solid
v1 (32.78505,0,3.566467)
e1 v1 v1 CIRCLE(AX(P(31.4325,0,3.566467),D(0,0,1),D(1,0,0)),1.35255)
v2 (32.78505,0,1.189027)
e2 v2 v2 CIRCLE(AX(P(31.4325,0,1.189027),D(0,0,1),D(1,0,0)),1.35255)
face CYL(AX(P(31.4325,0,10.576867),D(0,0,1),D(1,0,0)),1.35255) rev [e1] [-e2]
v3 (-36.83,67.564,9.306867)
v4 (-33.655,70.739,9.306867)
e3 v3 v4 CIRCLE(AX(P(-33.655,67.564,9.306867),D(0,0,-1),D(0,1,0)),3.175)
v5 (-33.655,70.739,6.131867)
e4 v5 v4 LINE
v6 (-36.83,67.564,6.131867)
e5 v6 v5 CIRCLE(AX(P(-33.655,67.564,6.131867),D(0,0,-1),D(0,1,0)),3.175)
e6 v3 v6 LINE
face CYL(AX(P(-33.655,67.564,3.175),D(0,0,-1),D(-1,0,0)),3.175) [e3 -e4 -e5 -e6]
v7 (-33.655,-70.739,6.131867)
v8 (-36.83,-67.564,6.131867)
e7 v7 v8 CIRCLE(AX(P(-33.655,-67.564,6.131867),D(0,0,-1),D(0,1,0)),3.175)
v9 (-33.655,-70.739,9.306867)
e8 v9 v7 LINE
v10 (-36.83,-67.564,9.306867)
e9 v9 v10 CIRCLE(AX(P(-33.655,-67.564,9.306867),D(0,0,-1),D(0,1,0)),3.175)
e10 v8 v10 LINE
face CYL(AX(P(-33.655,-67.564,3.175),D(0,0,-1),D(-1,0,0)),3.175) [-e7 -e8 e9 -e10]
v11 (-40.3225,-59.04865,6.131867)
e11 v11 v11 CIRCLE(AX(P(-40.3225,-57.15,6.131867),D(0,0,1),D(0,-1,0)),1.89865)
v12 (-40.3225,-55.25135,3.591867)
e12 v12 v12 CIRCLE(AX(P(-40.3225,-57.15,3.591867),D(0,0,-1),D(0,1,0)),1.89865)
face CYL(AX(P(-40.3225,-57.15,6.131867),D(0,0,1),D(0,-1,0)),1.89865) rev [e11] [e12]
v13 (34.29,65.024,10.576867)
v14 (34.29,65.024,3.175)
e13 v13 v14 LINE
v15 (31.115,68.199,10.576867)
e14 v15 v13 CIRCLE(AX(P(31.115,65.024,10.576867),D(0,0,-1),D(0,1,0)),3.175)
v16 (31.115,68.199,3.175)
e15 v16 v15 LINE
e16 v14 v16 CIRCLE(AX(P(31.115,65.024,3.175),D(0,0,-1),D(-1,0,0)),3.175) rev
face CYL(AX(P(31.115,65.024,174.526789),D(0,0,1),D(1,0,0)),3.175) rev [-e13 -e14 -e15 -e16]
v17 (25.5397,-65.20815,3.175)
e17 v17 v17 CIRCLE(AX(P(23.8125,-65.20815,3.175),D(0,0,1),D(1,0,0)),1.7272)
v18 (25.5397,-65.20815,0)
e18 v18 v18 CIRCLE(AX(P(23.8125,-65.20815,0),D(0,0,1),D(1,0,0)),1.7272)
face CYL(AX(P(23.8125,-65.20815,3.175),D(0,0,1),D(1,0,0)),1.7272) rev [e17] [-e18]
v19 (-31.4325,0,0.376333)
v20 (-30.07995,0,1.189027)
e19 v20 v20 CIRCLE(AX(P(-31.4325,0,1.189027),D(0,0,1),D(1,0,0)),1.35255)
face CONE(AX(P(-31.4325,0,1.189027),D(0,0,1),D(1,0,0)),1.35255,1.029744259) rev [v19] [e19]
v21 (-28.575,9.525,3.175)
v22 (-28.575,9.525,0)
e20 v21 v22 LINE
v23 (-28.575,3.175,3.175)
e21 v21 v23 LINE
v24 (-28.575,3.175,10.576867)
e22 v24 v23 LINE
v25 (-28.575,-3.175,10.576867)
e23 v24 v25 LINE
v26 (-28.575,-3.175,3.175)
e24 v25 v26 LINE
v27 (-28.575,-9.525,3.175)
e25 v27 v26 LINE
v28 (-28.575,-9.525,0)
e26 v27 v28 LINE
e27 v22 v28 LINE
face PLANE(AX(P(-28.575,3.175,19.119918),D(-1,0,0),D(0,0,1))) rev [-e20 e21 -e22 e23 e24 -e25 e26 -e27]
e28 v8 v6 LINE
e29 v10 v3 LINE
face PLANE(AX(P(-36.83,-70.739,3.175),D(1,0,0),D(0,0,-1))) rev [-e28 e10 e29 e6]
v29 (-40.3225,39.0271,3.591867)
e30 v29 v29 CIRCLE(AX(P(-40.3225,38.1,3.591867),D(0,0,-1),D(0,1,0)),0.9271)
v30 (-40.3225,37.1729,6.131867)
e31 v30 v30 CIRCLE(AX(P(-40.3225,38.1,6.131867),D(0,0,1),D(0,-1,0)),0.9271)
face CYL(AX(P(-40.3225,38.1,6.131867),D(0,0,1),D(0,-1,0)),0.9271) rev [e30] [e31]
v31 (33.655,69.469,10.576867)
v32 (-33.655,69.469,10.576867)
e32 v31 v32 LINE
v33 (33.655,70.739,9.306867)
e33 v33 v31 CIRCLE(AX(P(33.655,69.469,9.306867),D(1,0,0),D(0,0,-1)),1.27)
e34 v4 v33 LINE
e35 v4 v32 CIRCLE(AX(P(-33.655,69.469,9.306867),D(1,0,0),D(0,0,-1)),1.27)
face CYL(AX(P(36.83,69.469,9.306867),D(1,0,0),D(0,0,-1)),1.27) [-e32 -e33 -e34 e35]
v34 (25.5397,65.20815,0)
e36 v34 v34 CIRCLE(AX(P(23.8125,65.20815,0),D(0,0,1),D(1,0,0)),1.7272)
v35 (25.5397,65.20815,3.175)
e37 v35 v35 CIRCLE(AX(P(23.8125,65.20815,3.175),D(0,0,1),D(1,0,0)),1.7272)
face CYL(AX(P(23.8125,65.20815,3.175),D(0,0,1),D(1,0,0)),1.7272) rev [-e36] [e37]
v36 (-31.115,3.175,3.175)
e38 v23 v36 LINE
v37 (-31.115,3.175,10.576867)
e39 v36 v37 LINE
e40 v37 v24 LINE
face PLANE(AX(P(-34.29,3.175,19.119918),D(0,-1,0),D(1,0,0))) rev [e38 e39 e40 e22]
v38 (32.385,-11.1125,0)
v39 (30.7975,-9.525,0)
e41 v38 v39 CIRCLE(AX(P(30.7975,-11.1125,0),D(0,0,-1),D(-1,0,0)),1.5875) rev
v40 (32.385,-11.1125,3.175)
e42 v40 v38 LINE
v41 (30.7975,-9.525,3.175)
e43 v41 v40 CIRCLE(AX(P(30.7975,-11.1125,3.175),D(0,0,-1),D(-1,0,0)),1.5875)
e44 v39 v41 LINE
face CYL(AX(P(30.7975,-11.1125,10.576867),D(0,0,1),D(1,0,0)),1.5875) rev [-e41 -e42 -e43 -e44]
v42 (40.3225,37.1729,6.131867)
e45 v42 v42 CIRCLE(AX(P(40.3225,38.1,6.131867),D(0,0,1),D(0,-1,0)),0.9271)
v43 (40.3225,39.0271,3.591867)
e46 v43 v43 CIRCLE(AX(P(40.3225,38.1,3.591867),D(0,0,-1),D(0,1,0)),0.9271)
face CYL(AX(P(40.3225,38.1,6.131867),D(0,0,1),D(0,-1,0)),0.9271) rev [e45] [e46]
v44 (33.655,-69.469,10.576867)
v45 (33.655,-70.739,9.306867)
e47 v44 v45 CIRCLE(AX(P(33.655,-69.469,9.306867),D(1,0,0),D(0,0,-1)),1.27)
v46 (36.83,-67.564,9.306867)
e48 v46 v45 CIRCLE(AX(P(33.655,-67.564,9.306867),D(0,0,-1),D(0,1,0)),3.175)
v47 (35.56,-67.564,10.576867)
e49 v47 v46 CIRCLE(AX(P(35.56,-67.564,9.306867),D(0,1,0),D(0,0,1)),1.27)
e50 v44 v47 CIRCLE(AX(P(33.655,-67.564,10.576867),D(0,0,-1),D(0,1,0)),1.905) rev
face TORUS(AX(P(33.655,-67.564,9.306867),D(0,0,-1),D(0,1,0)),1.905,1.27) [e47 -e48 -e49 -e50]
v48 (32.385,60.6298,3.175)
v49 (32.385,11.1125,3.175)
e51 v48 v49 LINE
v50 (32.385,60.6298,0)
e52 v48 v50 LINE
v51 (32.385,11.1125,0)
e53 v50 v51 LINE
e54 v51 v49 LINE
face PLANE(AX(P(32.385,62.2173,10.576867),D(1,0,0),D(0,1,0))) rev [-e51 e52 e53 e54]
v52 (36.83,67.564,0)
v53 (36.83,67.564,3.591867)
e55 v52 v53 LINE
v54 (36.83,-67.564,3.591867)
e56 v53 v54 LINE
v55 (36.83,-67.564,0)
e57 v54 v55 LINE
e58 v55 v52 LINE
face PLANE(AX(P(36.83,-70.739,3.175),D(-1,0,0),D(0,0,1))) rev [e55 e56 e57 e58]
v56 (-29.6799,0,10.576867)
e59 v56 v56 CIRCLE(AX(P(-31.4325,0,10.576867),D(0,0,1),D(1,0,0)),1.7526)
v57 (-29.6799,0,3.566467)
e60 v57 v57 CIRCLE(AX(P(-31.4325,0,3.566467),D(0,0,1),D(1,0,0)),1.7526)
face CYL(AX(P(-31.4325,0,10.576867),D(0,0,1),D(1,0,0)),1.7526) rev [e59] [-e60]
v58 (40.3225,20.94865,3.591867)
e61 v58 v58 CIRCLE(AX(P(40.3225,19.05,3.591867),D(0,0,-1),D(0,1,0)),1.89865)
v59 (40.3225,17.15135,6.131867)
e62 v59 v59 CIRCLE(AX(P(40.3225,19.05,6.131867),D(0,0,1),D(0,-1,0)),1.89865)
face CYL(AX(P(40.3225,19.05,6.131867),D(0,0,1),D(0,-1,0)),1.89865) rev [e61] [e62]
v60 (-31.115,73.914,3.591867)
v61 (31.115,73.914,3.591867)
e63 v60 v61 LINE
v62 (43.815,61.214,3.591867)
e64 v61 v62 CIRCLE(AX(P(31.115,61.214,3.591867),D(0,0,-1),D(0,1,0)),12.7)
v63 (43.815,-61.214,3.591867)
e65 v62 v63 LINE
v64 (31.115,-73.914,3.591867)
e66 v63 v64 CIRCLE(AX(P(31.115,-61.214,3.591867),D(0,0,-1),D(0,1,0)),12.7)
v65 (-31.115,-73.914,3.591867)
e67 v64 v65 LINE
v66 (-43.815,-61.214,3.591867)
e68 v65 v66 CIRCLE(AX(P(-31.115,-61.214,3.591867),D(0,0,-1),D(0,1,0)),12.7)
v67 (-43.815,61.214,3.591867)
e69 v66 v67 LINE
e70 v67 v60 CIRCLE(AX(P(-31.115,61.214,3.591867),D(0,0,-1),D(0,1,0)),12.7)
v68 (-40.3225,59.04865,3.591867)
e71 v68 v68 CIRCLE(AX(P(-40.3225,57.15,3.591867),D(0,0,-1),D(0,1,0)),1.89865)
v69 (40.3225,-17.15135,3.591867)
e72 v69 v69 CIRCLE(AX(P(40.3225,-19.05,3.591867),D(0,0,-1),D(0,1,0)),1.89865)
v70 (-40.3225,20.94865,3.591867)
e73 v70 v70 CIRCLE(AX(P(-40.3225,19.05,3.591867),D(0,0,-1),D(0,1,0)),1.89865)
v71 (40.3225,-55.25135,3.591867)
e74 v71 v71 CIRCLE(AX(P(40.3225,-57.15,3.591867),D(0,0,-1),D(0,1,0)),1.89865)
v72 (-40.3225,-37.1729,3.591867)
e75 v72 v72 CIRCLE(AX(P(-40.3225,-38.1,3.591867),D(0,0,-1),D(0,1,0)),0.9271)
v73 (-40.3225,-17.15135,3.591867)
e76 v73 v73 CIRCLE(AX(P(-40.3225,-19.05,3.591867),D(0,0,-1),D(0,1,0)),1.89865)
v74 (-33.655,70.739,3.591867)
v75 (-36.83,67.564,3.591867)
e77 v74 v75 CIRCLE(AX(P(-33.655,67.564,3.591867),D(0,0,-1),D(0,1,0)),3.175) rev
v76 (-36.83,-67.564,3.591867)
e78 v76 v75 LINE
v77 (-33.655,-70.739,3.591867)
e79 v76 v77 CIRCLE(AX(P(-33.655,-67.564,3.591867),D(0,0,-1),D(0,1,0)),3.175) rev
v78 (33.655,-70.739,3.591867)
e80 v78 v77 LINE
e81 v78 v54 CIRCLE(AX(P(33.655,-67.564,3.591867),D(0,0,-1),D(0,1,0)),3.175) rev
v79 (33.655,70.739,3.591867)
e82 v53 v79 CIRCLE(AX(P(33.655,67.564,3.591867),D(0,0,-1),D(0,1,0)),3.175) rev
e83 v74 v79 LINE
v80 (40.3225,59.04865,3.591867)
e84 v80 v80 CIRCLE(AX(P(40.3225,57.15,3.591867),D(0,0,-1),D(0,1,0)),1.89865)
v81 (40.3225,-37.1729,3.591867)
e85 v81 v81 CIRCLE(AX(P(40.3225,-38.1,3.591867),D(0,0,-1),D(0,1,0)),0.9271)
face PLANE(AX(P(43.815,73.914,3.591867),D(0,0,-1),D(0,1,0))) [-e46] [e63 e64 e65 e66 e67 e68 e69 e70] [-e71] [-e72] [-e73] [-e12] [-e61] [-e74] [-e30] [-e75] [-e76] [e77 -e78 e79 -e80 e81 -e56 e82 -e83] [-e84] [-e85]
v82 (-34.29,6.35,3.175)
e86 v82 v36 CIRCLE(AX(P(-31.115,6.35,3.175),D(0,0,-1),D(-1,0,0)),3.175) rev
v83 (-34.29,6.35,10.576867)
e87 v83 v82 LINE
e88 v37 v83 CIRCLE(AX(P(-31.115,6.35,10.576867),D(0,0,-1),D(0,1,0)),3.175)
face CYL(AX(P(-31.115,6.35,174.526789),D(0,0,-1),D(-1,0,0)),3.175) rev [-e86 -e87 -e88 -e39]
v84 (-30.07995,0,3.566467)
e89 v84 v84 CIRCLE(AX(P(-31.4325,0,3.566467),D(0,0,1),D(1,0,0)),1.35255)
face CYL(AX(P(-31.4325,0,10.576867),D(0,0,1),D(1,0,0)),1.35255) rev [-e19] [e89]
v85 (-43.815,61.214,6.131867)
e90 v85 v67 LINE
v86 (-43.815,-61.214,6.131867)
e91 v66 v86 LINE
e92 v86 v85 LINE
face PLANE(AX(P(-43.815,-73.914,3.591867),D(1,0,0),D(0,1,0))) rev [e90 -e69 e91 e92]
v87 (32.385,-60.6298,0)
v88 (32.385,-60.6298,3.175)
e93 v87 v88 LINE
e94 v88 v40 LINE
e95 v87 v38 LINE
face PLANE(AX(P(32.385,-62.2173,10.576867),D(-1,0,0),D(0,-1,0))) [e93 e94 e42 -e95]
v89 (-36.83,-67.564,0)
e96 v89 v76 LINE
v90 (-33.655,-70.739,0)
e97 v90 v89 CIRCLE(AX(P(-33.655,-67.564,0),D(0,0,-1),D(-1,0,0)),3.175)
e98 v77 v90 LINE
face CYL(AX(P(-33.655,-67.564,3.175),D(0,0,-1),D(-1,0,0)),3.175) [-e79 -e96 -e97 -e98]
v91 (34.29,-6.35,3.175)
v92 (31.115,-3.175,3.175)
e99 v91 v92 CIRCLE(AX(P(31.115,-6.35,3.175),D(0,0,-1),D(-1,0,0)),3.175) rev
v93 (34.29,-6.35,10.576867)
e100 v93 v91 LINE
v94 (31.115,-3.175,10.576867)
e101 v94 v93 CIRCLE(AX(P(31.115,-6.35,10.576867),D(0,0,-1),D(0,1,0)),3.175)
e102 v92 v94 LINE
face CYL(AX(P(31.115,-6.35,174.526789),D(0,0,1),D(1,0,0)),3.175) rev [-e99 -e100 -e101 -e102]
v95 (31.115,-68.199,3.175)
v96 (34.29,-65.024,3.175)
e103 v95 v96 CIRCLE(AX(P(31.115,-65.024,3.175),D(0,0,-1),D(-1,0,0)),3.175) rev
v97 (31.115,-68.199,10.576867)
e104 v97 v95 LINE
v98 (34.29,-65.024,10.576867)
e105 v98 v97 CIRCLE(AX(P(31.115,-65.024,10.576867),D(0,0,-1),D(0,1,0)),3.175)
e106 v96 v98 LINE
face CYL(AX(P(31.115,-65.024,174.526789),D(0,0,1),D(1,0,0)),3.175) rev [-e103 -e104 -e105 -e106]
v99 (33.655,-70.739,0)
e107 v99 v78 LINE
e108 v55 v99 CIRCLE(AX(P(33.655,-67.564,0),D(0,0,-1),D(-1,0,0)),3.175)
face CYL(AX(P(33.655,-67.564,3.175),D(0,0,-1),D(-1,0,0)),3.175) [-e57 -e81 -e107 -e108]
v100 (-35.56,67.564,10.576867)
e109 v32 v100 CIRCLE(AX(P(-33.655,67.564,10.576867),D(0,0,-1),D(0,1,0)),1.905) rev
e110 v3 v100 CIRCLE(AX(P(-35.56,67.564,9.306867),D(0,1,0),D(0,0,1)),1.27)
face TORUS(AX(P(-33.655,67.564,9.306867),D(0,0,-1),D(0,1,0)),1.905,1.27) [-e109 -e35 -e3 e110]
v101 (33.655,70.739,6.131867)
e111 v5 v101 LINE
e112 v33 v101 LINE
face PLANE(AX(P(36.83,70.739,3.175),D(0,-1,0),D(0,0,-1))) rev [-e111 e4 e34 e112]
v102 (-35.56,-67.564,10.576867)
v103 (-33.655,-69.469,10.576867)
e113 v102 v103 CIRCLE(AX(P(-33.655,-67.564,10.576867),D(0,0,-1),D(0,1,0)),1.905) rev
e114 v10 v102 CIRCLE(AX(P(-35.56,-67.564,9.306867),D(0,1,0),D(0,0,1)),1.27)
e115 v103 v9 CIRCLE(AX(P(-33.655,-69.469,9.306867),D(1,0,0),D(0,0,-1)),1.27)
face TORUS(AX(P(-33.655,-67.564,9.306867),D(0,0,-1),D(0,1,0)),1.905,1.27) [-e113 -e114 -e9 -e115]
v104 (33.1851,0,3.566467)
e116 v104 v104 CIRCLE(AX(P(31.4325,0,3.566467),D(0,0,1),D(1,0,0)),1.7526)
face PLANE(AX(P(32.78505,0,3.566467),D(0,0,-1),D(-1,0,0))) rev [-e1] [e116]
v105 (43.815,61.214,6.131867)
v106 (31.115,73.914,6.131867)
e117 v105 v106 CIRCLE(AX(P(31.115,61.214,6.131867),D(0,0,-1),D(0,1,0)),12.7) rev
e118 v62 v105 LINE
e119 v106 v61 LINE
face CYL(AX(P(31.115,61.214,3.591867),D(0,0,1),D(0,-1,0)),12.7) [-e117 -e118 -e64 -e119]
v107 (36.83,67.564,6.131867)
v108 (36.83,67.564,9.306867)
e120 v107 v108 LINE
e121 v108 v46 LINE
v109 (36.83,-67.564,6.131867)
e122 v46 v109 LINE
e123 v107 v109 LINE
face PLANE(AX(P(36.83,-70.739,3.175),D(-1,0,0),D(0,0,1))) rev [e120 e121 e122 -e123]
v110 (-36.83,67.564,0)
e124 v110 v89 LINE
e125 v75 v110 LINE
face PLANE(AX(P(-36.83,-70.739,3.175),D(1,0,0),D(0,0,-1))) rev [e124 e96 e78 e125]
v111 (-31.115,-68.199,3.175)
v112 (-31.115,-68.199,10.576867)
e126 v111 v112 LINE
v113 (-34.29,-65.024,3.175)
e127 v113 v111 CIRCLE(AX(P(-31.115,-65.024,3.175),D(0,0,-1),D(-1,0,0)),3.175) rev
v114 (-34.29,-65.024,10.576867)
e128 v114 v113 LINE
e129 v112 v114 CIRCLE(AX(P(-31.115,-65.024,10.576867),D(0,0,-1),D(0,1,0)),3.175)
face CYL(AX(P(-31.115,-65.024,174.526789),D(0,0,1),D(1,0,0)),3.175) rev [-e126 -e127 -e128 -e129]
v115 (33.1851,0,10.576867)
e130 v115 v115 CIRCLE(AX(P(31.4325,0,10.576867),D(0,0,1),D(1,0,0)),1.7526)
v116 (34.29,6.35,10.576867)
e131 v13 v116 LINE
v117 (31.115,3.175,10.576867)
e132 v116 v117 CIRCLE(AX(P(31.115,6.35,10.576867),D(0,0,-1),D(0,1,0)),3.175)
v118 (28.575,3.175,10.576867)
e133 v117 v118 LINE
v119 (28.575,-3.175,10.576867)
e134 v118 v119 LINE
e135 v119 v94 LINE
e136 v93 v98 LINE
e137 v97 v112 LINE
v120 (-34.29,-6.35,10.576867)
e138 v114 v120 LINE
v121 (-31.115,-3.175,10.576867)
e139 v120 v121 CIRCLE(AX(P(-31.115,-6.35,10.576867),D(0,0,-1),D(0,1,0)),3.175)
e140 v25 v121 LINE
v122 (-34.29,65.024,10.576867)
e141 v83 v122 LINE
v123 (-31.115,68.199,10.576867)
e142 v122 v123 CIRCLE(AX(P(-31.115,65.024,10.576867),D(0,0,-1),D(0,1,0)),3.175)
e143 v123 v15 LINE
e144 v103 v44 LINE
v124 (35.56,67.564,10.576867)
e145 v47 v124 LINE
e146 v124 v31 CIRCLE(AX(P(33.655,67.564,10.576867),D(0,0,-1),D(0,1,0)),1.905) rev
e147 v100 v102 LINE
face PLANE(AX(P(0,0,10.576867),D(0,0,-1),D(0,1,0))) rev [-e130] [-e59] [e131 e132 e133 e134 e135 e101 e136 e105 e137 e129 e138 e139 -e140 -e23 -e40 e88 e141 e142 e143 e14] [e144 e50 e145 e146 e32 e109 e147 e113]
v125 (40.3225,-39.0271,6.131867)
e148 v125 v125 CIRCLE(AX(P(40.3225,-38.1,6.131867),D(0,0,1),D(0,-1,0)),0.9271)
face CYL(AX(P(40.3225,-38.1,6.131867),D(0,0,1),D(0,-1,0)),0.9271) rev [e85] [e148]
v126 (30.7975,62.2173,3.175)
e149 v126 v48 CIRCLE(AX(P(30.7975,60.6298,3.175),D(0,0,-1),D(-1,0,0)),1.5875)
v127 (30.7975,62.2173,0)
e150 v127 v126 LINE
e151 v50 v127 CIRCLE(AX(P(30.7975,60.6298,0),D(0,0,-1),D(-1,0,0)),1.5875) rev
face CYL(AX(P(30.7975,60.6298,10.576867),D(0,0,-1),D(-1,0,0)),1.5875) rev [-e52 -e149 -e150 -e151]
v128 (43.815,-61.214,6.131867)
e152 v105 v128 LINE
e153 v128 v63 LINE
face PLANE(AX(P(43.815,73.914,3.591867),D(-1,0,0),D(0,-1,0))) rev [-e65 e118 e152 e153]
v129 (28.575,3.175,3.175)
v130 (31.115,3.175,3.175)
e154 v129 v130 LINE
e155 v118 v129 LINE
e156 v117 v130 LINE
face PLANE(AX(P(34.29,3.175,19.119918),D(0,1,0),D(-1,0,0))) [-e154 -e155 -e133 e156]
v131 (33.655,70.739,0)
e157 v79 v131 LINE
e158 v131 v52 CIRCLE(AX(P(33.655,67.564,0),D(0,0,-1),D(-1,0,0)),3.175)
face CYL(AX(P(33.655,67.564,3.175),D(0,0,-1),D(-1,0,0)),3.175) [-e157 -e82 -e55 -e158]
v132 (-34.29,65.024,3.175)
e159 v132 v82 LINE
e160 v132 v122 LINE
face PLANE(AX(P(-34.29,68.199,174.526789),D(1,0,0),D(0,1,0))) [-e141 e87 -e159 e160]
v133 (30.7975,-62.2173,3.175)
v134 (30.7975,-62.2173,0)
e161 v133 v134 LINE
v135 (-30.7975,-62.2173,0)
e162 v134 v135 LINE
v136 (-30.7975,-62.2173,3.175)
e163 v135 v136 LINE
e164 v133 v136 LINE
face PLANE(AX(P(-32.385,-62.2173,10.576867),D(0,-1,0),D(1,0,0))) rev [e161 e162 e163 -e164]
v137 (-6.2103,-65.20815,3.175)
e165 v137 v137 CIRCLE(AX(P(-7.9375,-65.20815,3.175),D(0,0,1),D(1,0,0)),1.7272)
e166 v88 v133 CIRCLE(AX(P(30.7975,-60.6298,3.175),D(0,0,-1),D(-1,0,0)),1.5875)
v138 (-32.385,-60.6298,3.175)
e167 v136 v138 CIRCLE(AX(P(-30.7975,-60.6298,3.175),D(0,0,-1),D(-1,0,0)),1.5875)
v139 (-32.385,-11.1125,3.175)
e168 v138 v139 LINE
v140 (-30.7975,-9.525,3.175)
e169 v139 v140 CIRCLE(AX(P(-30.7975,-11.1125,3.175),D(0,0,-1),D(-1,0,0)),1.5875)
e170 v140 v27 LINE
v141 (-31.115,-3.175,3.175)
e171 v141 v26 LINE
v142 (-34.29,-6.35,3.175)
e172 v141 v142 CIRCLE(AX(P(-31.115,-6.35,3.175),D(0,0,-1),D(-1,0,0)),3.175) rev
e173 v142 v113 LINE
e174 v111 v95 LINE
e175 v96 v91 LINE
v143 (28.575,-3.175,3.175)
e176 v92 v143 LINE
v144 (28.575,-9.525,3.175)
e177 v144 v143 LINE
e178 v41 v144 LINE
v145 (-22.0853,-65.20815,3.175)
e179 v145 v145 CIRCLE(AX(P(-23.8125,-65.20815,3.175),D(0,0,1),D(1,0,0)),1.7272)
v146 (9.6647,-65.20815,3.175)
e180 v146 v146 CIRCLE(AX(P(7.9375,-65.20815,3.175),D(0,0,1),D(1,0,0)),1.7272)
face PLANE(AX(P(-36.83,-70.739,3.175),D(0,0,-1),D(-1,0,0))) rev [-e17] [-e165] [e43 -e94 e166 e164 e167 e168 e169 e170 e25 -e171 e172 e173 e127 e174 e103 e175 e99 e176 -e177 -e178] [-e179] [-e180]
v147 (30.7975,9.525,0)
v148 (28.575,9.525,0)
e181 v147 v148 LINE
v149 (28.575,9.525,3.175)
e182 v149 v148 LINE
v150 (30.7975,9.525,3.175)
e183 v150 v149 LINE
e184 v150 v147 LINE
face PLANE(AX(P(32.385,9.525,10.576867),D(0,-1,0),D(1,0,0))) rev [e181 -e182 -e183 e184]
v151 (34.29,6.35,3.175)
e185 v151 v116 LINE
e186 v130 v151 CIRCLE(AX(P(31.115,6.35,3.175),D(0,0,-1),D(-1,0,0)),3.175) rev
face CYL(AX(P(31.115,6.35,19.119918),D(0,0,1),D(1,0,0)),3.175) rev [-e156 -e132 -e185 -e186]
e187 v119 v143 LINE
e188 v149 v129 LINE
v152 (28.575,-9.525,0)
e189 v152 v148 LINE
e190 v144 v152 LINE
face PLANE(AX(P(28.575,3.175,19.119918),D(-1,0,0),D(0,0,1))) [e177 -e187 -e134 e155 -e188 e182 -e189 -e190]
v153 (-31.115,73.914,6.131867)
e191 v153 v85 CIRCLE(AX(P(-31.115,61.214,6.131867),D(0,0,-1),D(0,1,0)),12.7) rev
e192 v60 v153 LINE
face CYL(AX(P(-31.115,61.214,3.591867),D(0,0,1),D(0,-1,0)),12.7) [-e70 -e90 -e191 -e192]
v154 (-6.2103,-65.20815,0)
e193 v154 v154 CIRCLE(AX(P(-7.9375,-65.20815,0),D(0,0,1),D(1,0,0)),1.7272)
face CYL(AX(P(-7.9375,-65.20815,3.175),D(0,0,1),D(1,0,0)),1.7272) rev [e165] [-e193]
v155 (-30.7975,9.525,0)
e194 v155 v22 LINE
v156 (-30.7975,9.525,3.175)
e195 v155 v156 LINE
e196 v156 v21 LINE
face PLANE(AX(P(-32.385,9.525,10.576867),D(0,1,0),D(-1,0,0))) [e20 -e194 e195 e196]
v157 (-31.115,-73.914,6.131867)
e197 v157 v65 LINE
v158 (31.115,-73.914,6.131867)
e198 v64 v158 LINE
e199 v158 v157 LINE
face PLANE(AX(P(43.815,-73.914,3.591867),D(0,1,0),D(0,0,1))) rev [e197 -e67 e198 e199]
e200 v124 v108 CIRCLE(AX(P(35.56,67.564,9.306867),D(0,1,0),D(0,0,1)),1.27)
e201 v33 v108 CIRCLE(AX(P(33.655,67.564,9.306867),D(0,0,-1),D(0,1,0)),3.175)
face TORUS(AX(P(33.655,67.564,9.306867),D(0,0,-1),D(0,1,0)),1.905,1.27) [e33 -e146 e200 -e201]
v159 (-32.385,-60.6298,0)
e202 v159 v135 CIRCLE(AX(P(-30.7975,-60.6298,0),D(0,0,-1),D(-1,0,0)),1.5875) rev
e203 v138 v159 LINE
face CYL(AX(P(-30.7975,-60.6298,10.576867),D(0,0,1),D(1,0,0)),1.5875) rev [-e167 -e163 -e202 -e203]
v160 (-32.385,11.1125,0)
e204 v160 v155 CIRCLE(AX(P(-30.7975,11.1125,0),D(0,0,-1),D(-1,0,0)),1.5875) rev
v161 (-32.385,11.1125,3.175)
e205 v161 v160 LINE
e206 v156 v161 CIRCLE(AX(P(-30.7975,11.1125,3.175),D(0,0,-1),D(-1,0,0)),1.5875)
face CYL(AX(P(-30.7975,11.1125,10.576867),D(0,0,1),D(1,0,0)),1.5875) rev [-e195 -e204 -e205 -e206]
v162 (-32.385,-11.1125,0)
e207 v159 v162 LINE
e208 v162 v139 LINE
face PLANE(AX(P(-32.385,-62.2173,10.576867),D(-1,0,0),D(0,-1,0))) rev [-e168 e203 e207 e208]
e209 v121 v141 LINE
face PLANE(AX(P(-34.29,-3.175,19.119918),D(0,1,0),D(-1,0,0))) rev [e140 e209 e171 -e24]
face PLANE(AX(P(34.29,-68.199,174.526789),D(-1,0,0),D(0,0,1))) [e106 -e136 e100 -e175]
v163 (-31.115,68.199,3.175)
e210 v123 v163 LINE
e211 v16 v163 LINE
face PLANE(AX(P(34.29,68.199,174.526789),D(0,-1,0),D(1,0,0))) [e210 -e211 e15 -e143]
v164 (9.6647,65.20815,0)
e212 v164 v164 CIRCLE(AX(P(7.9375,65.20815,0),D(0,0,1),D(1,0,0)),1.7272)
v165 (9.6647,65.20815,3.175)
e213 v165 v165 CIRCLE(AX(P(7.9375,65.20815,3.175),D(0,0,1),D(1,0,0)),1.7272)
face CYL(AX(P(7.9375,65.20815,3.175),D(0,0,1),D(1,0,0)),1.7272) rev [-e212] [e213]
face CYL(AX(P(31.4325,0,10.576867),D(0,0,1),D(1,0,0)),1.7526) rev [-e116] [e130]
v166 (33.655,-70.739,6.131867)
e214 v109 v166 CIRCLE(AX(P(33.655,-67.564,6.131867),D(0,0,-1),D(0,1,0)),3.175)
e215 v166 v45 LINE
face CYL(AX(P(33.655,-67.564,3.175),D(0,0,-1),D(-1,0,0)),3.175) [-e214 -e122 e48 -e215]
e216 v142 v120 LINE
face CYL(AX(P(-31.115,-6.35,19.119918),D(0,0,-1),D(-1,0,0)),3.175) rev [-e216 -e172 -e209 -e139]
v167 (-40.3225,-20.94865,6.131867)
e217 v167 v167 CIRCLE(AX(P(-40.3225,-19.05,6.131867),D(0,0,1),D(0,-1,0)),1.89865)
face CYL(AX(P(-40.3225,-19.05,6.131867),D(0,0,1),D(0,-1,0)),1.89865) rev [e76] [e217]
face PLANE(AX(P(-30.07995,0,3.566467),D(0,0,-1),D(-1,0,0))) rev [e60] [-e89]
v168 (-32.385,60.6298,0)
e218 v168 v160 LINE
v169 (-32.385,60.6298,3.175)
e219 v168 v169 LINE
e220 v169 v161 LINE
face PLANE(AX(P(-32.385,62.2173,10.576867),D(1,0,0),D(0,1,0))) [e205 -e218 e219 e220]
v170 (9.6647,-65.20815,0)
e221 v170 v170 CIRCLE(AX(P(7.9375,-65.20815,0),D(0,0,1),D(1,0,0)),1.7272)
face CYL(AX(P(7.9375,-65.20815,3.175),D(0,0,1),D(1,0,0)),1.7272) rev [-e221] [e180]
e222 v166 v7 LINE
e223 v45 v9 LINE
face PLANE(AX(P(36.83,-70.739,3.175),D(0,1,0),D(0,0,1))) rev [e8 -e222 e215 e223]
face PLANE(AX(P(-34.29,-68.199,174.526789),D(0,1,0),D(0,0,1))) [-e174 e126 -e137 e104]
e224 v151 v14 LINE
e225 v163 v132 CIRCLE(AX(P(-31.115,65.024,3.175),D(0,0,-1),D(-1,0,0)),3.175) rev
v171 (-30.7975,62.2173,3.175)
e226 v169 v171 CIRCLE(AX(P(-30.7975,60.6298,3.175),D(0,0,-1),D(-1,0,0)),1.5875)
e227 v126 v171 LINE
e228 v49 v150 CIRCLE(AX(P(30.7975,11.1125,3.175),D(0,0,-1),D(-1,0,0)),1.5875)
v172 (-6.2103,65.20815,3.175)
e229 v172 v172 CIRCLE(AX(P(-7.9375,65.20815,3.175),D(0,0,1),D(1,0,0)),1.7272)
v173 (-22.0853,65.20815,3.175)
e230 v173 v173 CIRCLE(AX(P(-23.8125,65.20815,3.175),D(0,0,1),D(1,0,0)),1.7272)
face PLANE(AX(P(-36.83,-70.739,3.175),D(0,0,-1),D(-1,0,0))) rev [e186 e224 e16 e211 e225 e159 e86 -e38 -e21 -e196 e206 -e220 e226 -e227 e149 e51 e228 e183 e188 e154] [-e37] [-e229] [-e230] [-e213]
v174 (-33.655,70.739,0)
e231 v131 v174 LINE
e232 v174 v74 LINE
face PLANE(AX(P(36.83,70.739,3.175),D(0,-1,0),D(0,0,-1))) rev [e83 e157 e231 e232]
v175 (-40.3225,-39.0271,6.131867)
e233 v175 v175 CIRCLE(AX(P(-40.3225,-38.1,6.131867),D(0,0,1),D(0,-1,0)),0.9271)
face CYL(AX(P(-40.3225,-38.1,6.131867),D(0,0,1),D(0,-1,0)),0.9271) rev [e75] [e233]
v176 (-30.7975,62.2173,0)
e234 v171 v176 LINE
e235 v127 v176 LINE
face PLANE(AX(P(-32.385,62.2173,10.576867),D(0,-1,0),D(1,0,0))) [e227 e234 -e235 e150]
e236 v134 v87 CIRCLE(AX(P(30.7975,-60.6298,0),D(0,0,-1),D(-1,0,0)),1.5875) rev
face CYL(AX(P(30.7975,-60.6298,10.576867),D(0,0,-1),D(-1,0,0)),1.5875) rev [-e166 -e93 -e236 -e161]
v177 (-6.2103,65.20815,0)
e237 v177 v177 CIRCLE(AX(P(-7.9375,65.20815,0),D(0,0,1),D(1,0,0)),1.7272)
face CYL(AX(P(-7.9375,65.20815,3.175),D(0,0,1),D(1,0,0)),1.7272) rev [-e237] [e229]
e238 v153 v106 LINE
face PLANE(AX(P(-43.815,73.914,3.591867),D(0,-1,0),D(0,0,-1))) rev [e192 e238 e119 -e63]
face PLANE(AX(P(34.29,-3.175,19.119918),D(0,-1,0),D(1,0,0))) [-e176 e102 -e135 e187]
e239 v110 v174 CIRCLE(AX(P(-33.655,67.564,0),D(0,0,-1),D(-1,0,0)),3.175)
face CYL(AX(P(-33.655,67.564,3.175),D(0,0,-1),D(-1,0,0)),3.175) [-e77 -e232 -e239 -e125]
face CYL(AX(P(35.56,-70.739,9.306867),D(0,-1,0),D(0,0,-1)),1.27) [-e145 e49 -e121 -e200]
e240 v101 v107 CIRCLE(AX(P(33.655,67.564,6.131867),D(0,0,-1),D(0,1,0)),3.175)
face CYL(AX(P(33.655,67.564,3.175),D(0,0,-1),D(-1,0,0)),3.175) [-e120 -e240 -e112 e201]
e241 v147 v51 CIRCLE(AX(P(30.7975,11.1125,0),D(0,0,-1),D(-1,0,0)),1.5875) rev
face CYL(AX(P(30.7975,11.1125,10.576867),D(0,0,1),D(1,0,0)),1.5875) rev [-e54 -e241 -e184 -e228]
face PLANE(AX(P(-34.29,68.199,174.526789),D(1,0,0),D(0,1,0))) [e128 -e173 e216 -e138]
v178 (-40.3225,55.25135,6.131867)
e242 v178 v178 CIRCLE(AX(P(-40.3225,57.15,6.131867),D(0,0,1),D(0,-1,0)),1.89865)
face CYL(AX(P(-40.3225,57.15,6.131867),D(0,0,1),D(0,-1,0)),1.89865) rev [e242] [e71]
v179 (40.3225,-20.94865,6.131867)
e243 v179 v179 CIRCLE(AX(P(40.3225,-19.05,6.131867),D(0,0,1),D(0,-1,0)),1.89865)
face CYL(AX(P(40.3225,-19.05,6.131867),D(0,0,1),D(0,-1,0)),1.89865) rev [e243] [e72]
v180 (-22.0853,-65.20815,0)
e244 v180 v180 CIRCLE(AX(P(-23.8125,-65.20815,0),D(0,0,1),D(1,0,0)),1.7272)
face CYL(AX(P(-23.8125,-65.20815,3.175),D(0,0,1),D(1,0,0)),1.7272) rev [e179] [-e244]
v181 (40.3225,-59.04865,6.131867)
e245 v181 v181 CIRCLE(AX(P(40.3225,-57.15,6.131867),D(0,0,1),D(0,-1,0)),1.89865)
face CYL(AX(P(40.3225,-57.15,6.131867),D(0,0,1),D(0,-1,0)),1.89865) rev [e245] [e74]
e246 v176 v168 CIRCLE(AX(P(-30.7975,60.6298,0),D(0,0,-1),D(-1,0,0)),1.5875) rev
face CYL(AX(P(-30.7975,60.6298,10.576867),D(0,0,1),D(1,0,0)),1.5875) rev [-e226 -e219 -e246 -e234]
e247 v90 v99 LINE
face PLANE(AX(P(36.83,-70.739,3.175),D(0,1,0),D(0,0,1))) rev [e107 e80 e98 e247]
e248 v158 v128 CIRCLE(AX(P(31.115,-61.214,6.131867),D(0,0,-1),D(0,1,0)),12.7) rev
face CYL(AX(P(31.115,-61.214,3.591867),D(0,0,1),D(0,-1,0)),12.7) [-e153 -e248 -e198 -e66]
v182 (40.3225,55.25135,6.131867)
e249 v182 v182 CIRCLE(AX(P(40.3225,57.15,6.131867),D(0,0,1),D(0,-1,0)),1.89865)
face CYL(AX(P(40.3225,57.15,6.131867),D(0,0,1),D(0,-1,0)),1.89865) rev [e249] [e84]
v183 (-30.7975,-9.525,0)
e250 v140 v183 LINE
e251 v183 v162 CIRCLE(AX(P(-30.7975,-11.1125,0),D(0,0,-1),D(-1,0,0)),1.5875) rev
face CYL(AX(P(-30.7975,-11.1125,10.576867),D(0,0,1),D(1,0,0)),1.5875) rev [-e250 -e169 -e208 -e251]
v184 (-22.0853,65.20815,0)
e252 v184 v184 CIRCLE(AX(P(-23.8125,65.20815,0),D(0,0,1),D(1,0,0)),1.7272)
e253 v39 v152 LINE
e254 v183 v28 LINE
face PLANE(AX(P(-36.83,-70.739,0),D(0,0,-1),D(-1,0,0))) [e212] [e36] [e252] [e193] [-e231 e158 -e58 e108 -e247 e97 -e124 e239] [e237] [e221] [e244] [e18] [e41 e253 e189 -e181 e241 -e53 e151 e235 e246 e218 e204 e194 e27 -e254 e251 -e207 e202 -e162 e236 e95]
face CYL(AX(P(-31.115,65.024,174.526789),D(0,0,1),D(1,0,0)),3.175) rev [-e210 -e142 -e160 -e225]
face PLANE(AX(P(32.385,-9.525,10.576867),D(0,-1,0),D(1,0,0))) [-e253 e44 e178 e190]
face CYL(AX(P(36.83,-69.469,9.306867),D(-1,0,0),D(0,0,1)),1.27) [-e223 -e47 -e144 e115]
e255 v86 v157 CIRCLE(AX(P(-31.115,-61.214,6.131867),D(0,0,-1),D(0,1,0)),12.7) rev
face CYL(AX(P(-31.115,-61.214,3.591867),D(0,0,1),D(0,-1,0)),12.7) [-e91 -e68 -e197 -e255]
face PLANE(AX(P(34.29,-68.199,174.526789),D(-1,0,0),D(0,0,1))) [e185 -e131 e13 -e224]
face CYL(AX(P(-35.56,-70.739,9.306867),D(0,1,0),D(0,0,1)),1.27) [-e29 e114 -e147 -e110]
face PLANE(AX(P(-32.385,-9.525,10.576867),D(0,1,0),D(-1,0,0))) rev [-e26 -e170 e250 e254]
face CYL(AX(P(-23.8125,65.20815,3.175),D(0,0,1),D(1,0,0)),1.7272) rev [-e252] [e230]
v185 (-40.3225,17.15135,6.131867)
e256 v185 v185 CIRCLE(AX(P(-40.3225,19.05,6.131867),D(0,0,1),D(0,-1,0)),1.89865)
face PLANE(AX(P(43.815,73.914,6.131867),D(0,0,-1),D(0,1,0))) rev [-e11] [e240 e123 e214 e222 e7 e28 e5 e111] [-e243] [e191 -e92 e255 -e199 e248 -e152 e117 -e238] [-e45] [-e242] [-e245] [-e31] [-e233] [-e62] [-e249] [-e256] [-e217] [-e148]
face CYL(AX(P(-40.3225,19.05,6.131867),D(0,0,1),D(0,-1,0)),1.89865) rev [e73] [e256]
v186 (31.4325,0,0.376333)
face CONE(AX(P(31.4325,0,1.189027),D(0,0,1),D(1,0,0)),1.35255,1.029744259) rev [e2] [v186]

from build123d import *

# Parameters (mm, degrees)
SKETCH1_W             = 73.66
SKETCH1_H             = 141.478
PLATE_DEPTH           = 3.175
SKETCH2_W             = 73.66
SKETCH2_H             = 141.478
SKETCH2_W_2           = 68.58
SKETCH2_H_2           = 136.398
WALLS_DEPTH           = 10.576866729
LIP_W                 = 87.63
LIP_H                 = 147.828
LIP_W_2               = 73.66
LIP_H_2               = 141.478
FLANGE_DEPTH          = 2.54
FILLET1_R             = 12.7
FILLET2_R             = 3.175
FILLET3_R             = 1.27
SKETCH16_W            = 5.715
SKETCH16_H            = 6.35
EXTRUDE4_DEPTH        = 7.401866729
FILLET6_R             = 3.175
F_6_CLEARANCE_HOLE1_D = 3.7973
F_1_64_TAPPED_HOLE1_D = 1.8542
CUT_EXTRUDE7_DEPTH    = 87.573112055
FILLET7_R             = 1.5875
FILLET7_OF_MIRROR5_R  = 1.5875
MIRROR6_DEPTH         = 3.175
F_4_CLEAR_MID_D       = 3.4544
HOLE_PAT_COUNT        = 3
HOLE_PAT_PITCH        = 15.875
HOLE_PAT_COL_COUNT    = 2
HOLE_PAT_COL_PITCH    = 15.875
MIRROR7_COPY_1_D      = 3.4544
MIRROR7_COPY_2_D      = 3.4544
MIRROR7_COPY_3_D      = 3.4544
MIRROR7_COPY_4_D      = 3.4544


# Read off the part's stored shape, not the designer's step: Mirror6
with BuildPart() as part:
    # Sketch1 → plate (new body)
    with BuildSketch(Plane.XY):
        Rectangle(SKETCH1_W, SKETCH1_H)
    extrude(amount=PLATE_DEPTH)

    # Sketch2 → walls (add)
    with BuildSketch(Plane.XY):
        Rectangle(SKETCH2_W, SKETCH2_H)
        Rectangle(SKETCH2_W_2, SKETCH2_H_2, mode=Mode.SUBTRACT)
    extrude(amount=WALLS_DEPTH)

    # lip → flange (add)
    with BuildSketch(Plane(origin=(0, 0, 6.131866729), x_dir=(1, 0, 0), z_dir=(0, 0, -1))):
        Rectangle(LIP_W, LIP_H)
        Rectangle(LIP_W_2, LIP_H_2, mode=Mode.SUBTRACT)
    extrude(amount=FLANGE_DEPTH)

    # Fillet1
    fillet1_edges = [part.edges().sort_by_distance(p)[0] for p in [
        (-43.815, 73.914, 4.861866729),
        (43.815, 73.914, 4.861866729),
        (43.815, -73.914, 4.861866729),
        (-43.815, -73.914, 4.861866729),
    ]]
    fillet(fillet1_edges, radius=FILLET1_R)

    # Fillet2
    fillet2_edges = [part.edges().sort_by_distance(p)[0] for p in [
        (34.29, -68.199, 6.875933364),
        (34.29, 68.199, 6.875933364),
        (-34.29, 68.199, 6.875933364),
        (-34.29, -68.199, 6.875933364),
        (-36.83, -70.739, 1.795933365),
        (-36.83, 70.739, 1.795933365),
        (36.83, 70.739, 1.795933365),
        (36.83, -70.739, 1.795933365),
        (-36.83, -70.739, 8.354366729),
        (-36.83, 70.739, 8.354366729),
        (36.83, 70.739, 8.354366729),
        (36.83, -70.739, 8.354366729),
    ]]
    fillet(fillet2_edges, radius=FILLET2_R)

    # Fillet3
    fillet3_edges = [part.edges().sort_by_distance(p)[0] for p in [
        (0, 70.739, 10.576866729),
        (0, -70.739, 10.576866729),
        (36.83, 0, 10.576866729),
        (-35.90006403, -69.80906403, 10.576866729),
        (35.90006403, -69.80906403, 10.576866729),
        (35.90006403, 69.80906403, 10.576866729),
        (-35.90006403, 69.80906403, 10.576866729),
        (-36.83, 0, 10.576866729),
    ]]
    fillet(fillet3_edges, radius=FILLET3_R)

    # Sketch16 → Extrude4 (add)
    with BuildSketch(Plane.XY.offset(3.175)):
        with Locations((-31.4325, 0)):
            Rectangle(SKETCH16_W, SKETCH16_H)
    extrude4 = extrude(amount=EXTRUDE4_DEPTH)

    # Sketch12 → #6-32 Tapped Hole1 (revolve, cut)
    with BuildSketch(Plane(origin=(-31.4325, 0, 10.576866729), x_dir=(0, -1, 0), z_dir=(1, 0, 0))):
        Polygon((0, 0), (0, 10.20053403), (1.35255, 9.38784), (1.35255, 7.0104), (1.7526, 7.0104), (1.7526, 0), align=None)
    f_6_32_tapped_hole1 = revolve(axis=Axis((-31.4325, 0, 16.926866729), (0, 0, -1)), mode=Mode.SUBTRACT)

    # Mirror4: Extrude4, #6-32 Tapped Hole1 across plane
    add(extrude4.mirror(Plane(origin=(0, 0, 0), x_dir=(0, 0, 1), z_dir=(1, 0, 0))))
    add(f_6_32_tapped_hole1.mirror(Plane(origin=(0, 0, 0), x_dir=(0, 0, 1), z_dir=(1, 0, 0))), mode=Mode.SUBTRACT)

    # Fillet6
    fillet6_edges = [part.edges().sort_by_distance(p)[0] for p in [
        (-34.29, -3.175, 6.875933364),
        (-34.29, 3.175, 6.875933364),
        (34.29, -3.175, 6.875933364),
        (34.29, 3.175, 6.875933364),
    ]]
    fillet(fillet6_edges, radius=FILLET6_R)

    # #6 Clearance Hole1 (through all)
    with Locations(Plane(origin=(-40.3225, -57.15, 6.131866729), x_dir=(0, 1, 0), z_dir=(0, 0, 1))):
        with Locations((0, 0), (38.1, 0), (114.3, 0), (76.2, 0)):
            f_6_clearance_hole1 = Hole(F_6_CLEARANCE_HOLE1_D / 2)

    # #1-64 Tapped Hole1 (through all)
    with Locations(Plane(origin=(-40.3225, -38.1, 6.131866729), x_dir=(0, 1, 0), z_dir=(0, 0, 1))):
        with Locations((0, 0), (76.2, 0)):
            f_1_64_tapped_hole1 = Hole(F_1_64_TAPPED_HOLE1_D / 2)

    # Mirror3: #6 Clearance Hole1, #1-64 Tapped Hole1 across plane
    add(f_6_clearance_hole1.mirror(Plane(origin=(0, 0, 0), x_dir=(0, 0, 1), z_dir=(1, 0, 0))), mode=Mode.SUBTRACT)
    add(f_1_64_tapped_hole1.mirror(Plane(origin=(0, 0, 0), x_dir=(0, 0, 1), z_dir=(1, 0, 0))), mode=Mode.SUBTRACT)

    # cutout → Cut-Extrude7 (cut, through all)
    with BuildSketch(Plane.XY):
        Polygon((0, 0), (0, 62.2173), (-32.385, 62.2173), (-32.385, 9.525), (-28.575, 9.525), (-28.575, 0), align=None)
    cut_extrude7 = extrude(amount=CUT_EXTRUDE7_DEPTH, mode=Mode.SUBTRACT)

    # Fillet7
    fillet7_edges = [part.edges().sort_by_distance(p)[0] for p in [
        (-32.385, 62.2173, 1.5875),
        (-32.385, 9.525, 1.5875),
    ]]
    fillet(fillet7_edges, radius=FILLET7_R)

    # Mirror5: Cut-Extrude7 across plane
    add(cut_extrude7.mirror(Plane.ZX), mode=Mode.SUBTRACT)

    # Fillet7 of Mirror5
    fillet7_of_mirror5_edges = [part.edges().sort_by_distance(p)[0] for p in [
        (-32.385, -62.2173, 1.5875),
        (-32.385, -9.525, 1.5875),
    ]]
    fillet(fillet7_of_mirror5_edges, radius=FILLET7_OF_MIRROR5_R)

    # Mirror6 outline → Mirror6 (cut)
    with BuildSketch(Plane.XY):
        with BuildLine():
            Line((28.575, -9.525), (28.575, 9.525))
            Line((28.575, 9.525), (30.7975, 9.525))
            ThreePointArc((30.7975, 9.525), (31.920032015, 9.989967985), (32.385, 11.1125))
            Line((32.385, 11.1125), (32.385, 60.6298))
            ThreePointArc((32.385, 60.6298), (31.920032015, 61.752332015), (30.7975, 62.2173))
            Line((30.7975, 62.2173), (0, 62.2173))
            Line((0, 62.2173), (0, -62.2173))
            Line((0, -62.2173), (30.7975, -62.2173))
            ThreePointArc((30.7975, -62.2173), (31.920032015, -61.752332015), (32.385, -60.6298))
            Line((32.385, -60.6298), (32.385, -11.1125))
            ThreePointArc((32.385, -11.1125), (31.920032015, -9.989967985), (30.7975, -9.525))
            Line((30.7975, -9.525), (28.575, -9.525))
        make_face()
    extrude(amount=MIRROR6_DEPTH, mode=Mode.SUBTRACT)

    # #4 Clear Mid (through all)
    with Locations(Plane.XY.offset(3.175)):
        with Locations((-7.9375, 65.20815)):
            f_4_clear_mid = Hole(F_4_CLEAR_MID_D / 2)

    # hole pat: #4 Clear Mid ×3
    with Locations(*[(i * HOLE_PAT_PITCH, 0, 0) for i in range(1, HOLE_PAT_COUNT)]):
        add(f_4_clear_mid, mode=Mode.SUBTRACT)

    # hole pat col: #4 Clear Mid ×2
    with Locations(*[(-i * HOLE_PAT_COL_PITCH, 0, 0) for i in range(1, HOLE_PAT_COL_COUNT)]):
        add(f_4_clear_mid, mode=Mode.SUBTRACT)

    # Mirror7 copy 1 (through all)
    with Locations(Plane(origin=(15.875, 0, 3.175), x_dir=(1, 0, 0), z_dir=(0, 0, 1))):
        with Locations((-7.9375, -65.20815)):
            Hole(MIRROR7_COPY_1_D / 2)

    # Mirror7 copy 2 (through all)
    with Locations(Plane(origin=(31.75, 0, 3.175), x_dir=(1, 0, 0), z_dir=(0, 0, 1))):
        with Locations((-7.9375, -65.20815)):
            Hole(MIRROR7_COPY_2_D / 2)

    # Mirror7 copy 3 (through all)
    with Locations(Plane(origin=(-15.875, 0, 3.175), x_dir=(1, 0, 0), z_dir=(0, 0, 1))):
        with Locations((-7.9375, -65.20815)):
            Hole(MIRROR7_COPY_3_D / 2)

    # Mirror7 copy 4 (through all)
    with Locations(Plane.XY.offset(3.175)):
        with Locations((-7.9375, -65.20815)):
            Hole(MIRROR7_COPY_4_D / 2)


solid = part.part
